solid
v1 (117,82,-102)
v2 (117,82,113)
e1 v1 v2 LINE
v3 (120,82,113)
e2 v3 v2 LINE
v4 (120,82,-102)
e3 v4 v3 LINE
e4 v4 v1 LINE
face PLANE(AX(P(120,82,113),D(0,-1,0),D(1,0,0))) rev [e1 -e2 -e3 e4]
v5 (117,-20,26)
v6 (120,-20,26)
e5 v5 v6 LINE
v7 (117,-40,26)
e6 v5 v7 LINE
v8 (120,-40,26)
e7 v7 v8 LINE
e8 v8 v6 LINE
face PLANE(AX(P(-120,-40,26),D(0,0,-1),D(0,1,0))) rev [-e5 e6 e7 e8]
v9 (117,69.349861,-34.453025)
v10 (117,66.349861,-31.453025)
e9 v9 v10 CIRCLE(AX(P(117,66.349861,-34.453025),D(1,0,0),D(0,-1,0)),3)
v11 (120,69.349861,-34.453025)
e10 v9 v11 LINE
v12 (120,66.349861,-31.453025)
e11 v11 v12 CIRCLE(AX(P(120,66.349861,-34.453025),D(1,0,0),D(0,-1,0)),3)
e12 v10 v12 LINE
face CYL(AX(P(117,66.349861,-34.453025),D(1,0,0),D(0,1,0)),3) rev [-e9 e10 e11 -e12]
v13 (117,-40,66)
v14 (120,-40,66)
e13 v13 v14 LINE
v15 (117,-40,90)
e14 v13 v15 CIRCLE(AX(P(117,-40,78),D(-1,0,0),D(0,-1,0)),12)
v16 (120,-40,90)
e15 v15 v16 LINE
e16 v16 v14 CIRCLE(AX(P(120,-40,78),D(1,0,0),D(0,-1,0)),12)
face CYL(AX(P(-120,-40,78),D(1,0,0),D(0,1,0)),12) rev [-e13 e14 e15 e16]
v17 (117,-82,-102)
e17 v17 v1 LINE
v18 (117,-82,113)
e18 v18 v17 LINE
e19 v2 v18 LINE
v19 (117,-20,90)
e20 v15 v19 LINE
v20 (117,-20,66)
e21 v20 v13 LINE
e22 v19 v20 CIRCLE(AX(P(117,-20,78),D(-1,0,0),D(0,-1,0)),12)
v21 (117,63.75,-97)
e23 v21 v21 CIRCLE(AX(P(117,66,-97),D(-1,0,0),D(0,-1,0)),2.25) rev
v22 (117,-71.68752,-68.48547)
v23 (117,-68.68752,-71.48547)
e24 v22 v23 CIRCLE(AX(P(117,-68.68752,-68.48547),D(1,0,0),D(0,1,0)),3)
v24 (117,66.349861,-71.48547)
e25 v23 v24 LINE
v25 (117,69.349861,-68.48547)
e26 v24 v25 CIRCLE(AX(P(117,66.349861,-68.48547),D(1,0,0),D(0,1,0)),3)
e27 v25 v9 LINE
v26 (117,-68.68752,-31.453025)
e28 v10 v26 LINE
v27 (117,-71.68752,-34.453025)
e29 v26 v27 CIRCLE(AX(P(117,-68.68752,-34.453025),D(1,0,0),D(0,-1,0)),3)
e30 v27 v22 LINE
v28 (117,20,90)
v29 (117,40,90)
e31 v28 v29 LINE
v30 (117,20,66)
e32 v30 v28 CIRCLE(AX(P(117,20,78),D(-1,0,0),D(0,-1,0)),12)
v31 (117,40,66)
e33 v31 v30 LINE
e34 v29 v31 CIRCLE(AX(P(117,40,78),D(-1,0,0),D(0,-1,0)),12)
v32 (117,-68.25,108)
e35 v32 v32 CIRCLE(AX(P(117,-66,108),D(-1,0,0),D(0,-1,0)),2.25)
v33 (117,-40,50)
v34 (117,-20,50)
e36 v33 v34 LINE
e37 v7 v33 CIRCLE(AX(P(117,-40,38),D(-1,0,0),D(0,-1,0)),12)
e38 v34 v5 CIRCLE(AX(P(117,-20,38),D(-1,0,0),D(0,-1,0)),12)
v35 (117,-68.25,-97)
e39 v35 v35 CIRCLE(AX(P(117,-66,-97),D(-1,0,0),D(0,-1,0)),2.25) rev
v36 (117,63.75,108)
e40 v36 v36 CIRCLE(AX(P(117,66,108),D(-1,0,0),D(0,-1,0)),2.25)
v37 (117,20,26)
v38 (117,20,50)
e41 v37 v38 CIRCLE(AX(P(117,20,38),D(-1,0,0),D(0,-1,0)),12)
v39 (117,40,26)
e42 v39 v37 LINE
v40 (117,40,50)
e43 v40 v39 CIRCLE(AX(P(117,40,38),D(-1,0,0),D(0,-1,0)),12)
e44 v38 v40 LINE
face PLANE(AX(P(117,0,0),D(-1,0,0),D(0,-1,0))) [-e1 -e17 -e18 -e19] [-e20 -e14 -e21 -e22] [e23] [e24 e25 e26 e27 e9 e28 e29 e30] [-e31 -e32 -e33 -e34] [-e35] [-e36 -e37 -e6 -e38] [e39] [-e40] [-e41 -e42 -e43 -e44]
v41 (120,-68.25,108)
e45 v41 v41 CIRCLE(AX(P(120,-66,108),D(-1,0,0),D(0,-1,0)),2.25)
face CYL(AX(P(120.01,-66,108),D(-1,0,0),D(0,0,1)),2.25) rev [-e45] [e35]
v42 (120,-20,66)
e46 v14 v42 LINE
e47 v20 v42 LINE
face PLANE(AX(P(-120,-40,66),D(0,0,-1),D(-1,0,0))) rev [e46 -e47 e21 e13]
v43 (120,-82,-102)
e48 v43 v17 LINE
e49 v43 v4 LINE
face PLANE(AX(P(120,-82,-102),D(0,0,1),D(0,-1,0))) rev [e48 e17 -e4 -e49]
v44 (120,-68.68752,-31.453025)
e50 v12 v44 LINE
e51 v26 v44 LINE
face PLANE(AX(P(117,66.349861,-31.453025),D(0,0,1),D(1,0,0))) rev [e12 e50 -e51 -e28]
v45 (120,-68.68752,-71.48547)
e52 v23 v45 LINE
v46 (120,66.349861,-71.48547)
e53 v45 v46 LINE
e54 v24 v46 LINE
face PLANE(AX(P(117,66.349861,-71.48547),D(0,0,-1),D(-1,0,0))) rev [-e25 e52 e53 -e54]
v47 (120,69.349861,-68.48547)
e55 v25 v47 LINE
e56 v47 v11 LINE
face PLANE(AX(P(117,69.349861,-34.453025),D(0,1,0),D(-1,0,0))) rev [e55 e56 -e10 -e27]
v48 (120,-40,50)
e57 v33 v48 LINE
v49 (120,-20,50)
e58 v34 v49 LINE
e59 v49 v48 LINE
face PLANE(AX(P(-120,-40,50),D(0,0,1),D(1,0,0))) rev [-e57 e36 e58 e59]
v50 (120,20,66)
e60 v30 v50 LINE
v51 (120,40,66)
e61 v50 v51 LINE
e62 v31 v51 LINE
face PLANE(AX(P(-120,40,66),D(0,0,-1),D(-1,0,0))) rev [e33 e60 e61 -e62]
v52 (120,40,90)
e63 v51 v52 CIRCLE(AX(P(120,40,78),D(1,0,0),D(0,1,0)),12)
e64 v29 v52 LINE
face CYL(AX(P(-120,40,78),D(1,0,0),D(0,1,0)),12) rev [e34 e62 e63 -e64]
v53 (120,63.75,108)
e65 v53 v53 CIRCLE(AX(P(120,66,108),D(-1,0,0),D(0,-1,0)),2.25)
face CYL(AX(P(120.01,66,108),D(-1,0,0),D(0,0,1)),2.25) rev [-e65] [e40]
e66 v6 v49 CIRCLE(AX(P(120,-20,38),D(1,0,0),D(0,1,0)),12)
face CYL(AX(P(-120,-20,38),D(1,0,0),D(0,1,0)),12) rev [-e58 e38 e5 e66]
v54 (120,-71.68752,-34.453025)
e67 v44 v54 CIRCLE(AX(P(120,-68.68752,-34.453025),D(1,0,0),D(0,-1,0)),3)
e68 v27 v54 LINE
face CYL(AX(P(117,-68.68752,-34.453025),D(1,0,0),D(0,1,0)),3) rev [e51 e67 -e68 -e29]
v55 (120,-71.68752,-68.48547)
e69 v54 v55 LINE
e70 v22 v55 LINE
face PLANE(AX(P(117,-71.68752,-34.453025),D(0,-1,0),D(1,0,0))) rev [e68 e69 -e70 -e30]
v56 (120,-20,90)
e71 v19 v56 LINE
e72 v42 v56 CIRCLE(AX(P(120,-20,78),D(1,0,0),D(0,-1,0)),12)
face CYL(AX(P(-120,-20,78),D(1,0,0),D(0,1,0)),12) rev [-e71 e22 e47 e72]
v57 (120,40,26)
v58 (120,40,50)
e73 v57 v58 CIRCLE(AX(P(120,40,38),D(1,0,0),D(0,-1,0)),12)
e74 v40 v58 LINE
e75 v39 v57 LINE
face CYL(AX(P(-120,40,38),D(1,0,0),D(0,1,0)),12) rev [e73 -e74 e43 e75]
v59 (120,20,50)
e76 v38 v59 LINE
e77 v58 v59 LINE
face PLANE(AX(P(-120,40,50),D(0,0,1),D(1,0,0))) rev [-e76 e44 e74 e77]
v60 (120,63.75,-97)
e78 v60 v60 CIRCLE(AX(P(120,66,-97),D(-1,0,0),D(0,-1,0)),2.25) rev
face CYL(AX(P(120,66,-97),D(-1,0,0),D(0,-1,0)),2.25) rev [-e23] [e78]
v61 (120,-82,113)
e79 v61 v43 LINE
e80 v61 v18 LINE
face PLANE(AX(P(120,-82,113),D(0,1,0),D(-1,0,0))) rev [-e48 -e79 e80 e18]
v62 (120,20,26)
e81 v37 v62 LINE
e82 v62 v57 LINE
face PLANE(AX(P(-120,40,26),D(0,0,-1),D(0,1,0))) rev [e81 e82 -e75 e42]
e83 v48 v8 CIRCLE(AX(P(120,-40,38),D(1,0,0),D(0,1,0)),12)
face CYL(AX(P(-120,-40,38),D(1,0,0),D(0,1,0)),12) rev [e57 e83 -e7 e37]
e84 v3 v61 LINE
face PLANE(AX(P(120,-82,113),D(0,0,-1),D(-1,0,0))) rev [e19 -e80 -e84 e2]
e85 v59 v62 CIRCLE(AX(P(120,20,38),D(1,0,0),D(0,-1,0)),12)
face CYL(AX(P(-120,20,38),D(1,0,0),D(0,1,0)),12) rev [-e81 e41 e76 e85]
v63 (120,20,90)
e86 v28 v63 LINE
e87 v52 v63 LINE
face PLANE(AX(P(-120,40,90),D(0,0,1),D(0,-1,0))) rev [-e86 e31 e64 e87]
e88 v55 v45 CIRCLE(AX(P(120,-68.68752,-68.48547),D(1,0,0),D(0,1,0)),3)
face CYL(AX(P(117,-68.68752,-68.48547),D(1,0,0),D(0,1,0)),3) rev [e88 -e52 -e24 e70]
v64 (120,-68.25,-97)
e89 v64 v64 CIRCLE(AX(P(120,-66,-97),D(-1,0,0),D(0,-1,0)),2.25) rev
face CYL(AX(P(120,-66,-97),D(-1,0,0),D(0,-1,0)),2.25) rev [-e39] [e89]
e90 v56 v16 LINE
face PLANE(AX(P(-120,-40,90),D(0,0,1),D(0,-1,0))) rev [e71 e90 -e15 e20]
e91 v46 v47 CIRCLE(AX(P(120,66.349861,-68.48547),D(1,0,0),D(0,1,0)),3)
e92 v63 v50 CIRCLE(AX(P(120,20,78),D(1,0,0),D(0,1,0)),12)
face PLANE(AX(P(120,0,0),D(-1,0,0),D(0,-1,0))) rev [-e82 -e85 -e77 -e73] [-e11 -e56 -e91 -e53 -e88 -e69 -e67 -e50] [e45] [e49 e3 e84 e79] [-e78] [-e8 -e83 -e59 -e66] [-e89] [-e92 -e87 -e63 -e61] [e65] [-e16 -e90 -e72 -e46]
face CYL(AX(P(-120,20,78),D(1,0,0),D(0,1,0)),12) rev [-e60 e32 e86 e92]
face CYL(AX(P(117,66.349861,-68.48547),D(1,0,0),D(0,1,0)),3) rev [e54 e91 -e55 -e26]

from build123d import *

# Parameters (mm, degrees)
SKETCH_1_W                         = 240
SKETCH_1_H                         = 170
EXTRUDE_1_DEPTH                    = 3
EXTRUDE_2_DEPTH                    = 10
EXTRUDE_3_DEPTH                    = 10
SKETCH_4_R                         = 3
CUT_EXTRUDE_1_DEPTH                = 6
SKETCH_5_R                         = 2.1
CUT_EXTRUDE_2_DEPTH                = 253.117036314
SKETCH_7_R                         = 1.6
SKETCH_7_W                         = 103
SKETCH_7_H                         = 20
EXTRUDE_4_DEPTH                    = 3
SKETCH_8_W                         = 110
SKETCH_8_H                         = 164
SKETCH_8_R                         = 2.1
EXTRUDE_5_DEPTH                    = 3
SKETCH_9_W                         = 240
SKETCH_9_H                         = 110
EXTRUDE_6_DEPTH                    = 3
SKETCH_10_R                        = 1.6
EXTRUDE_7_DEPTH                    = 2
SKETCH_11_W                        = 10
SKETCH_11_H                        = 20.7
SKETCH_11_R                        = 3
EXTRUDE_8_DEPTH                    = 6
CUT_EXTRUDE_3_DEPTH                = 237.788935552
SKETCH_14_R                        = 5
SKETCH_14_R_2                      = 2.25
EXTRUDE_9_DEPTH                    = 5
SKETCH_16_W                        = 20
SKETCH_16_H                        = 150
EXTRUDE_13_DEPTH                   = 3
CUT_EXTRUDE_5_DEPTH                = 282.346761133
EXTRUDE_START                      = 100
EXTRUDE_14_DEPTH                   = 10
SKETCH_21_R                        = 1.65
CUT_EXTRUDE_6_DEPTH                = 242.828451593
SKETCH_22_R                        = 3
CUT_EXTRUDE_7_DEPTH                = 240.666434863
FILLET_1_R                         = 3
FILLET_2_R                         = 3
SKETCH_4_5_R                       = 2.25
F_4_5_3MM_DEPTH                    = 3.01
SKETCH_Y_6_R                       = 3
CUT_EXTRUDE_Y_6_DEPTH              = 6.01
SKETCH_Y_3_2_R                     = 1.6
CUT_EXTRUDE_Y_3_2_DEPTH            = 3.01
A_M4_2_R                           = 2.25
A_M4_DEPTH                         = 9.01
B_M4_2_R                           = 2.25
B_M4_DEPTH                         = 9.01
MOVE_FACE_M4_4_2_4_5_BY            = 0.15
MOVE_FACE_M4_4_2_4_5_2_BY          = 0.15
MOVE_FACE_M4_4_2_4_5_3_BY          = 0.15
MOVE_FACE_M4_4_2_4_5_4_BY          = 0.15
MOVE_FACE_M4_4_2_4_5_5_BY          = 0.15
MOVE_FACE_M4_4_2_4_5_6_BY          = 0.15
MOVE_FACE_M4_4_2_4_5_7_BY          = 0.15
MOVE_FACE_M4_4_2_4_5_8_BY          = 0.15
MOVE_FACE_M4_6_4_5_BY              = 0.75
MOVE_FACE_M4_6_4_5_2_BY            = 0.75
MOVE_FACE_M4_6_4_5_3_BY            = 0.75
MOVE_FACE_M4_6_4_5_4_BY            = 0.75
MOVE_START                         = -85
MOVE_FACE_M4_3_2_4_5_OUTLINE_R     = 2.25
MOVE_FACE_M4_3_2_4_5_OUTLINE_R_2   = 1.6
MOVE_FACE_M4_3_2_4_5_DEPTH         = 3
MOVE_START_2                       = 82
MOVE_FACE_M4_3_2_4_5_2_OUTLINE_R   = 2.25
MOVE_FACE_M4_3_2_4_5_2_OUTLINE_R_2 = 1.6
MOVE_FACE_M4_3_2_4_5_2_DEPTH       = 3
MOVE_START_3                       = 47
MOVE_FACE_6_M3_3_3_OUTLINE_R       = 3
MOVE_FACE_6_M3_3_3_OUTLINE_R_2     = 1.65
MOVE_FACE_6_M3_3_3_DEPTH           = 6
MOVE_FACE_6_M3_3_3_2_OUTLINE_R     = 3
MOVE_FACE_6_M3_3_3_2_OUTLINE_R_2   = 1.65
MOVE_FACE_6_M3_3_3_2_DEPTH         = 6
MOVE_START_4                       = -82
MOVE_FACE_6_M3_3_3_3_OUTLINE_R     = 3
MOVE_FACE_6_M3_3_3_3_OUTLINE_R_2   = 1.65
MOVE_FACE_6_M3_3_3_3_DEPTH         = 6
MOVE_START_5                       = 76
MOVE_FACE_6_M3_3_3_4_OUTLINE_R     = 3
MOVE_FACE_6_M3_3_3_4_OUTLINE_R_2   = 1.65
MOVE_FACE_6_M3_3_3_4_DEPTH         = 6
Y_M3_5_9_1_5_DEPTH                 = 1.5
Y_M3_5_9_1_5_3_DEPTH               = 1.5
V3_03_A_105_START                  = 117
V3_03_A_105_OUTLINE_W              = 164
V3_03_A_105_OUTLINE_H              = 105
V3_03_A_105_OUTLINE_R              = 2.25
V3_03_A_105_DEPTH                  = 3
V3_04_B_105_START                  = -120
V3_04_B_105_OUTLINE_W              = 164
V3_04_B_105_OUTLINE_H              = 105
V3_04_B_105_OUTLINE_R              = 2.25
V3_04_B_105_DEPTH                  = 3
V3_06_B_105_START                  = 82
V3_06_B_105_OUTLINE_W              = 240
V3_06_B_105_OUTLINE_H              = 105
V3_06_B_105_OUTLINE_R              = 2.25
V3_06_B_105_DEPTH                  = 3
V3_05_A_105_START                  = -85
V3_05_A_105_OUTLINE_R              = 2.25
V3_05_A_105_DEPTH                  = 3
V3_77X53_2_W                       = 77
V3_77X53_2_H                       = 53
V3_77X53_DEPTH                     = 3.01
CUT_EXTRUDE_8_DEPTH                = 140.649561403


# Read off the part's stored shape, not the designer's step: the move face step, the move face step, the move face step, the move face step, the move face step, the move face step
with BuildPart() as part:
    # Sketch 1 → Extrude 1 (new body)
    with BuildSketch(Plane.XY):
        Rectangle(SKETCH_1_W, SKETCH_1_H)
    extrude(amount=EXTRUDE_1_DEPTH)

    # Sketch 2 → Extrude 2 (add)
    with BuildSketch(Plane.XY.offset(3)):
        Polygon((117, -82), (117, -61), (111, -61), (111, -76), (96, -76), (96, -82), align=None)
        Polygon((96, 82), (117, 82), (117, 61), (111, 61), (111, 76), (96, 76), align=None)
        Polygon((-96, -82), (-117, -82), (-117, -61), (-111, -61), (-111, -76), (-96, -76), align=None)
        Polygon((-117, 82), (-117, 61), (-111, 61), (-111, 76), (-96, 76), (-96, 82), align=None)
    extrude(amount=EXTRUDE_2_DEPTH)

    # Sketch 3 → Extrude 3 (add)
    with BuildSketch(Plane.XY.offset(3)):
        Polygon((-22, 35), (-7, 35), (-7, 41), (-28, 41), (-43, 41), (-43, 35), (-28, 35), (-28, 20), (-22, 20), align=None)
        Polygon((117, 20), (111, 20), (111, 35), (96, 35), (96, 41), (117, 41), align=None)
        Polygon((-28, -35), (-28, -20), (-22, -20), (-22, -41), (-43, -41), (-43, -35), align=None)
        Polygon((-83, -41), (-83, -35), (-98, -35), (-98, -20), (-104, -20), (-104, -41), align=None)
        Polygon((-104, 20), (-104, 35), (-104, 41), (-98, 41), (-83, 41), (-83, 35), (-98, 35), (-98, 20), align=None)
    extrude(amount=EXTRUDE_3_DEPTH)

    # Sketch 4 → Cut-Extrude 1 (cut)
    with BuildSketch(Plane.XZ.offset(82)):
        with Locations((101, 8)):
            Circle(SKETCH_4_R)
        with Locations((-101, 8)):
            Circle(SKETCH_4_R)
    extrude(amount=-CUT_EXTRUDE_1_DEPTH, mode=Mode.SUBTRACT)

    # Sketch 5 → Cut-Extrude 2 (cut, through all)
    with BuildSketch(Plane.ZY.offset(117)):
        with Locations(Location((8, -66, 0), (0, 0, 270))):
            Circle(SKETCH_5_R)
        with Locations(Location((8, 66, 0), (0, 0, 270))):
            Circle(SKETCH_5_R)
    extrude(amount=-CUT_EXTRUDE_2_DEPTH, mode=Mode.SUBTRACT)

    # Sketch Y___6 → Cut-Extrude Y___6 (cut)
    with BuildSketch(Plane.XZ.offset(-76)):
        with Locations((-101, 8)):
            Circle(SKETCH_Y_6_R)
        with Locations((101, 8)):
            Circle(SKETCH_Y_6_R)
    extrude(amount=-CUT_EXTRUDE_Y_6_DEPTH, mode=Mode.SUBTRACT)

    # Move Face M4__4.2_4.5 3: a curved face moved inward by 0.15
    add(Solid.thicken(part.faces().sort_by_distance((-114, -63.9, 8))[0], -MOVE_FACE_M4_4_2_4_5_3_BY), mode=Mode.SUBTRACT)

    # Move Face M4__4.2_4.5 4: a curved face moved inward by 0.15
    add(Solid.thicken(part.faces().sort_by_distance((-114, 68.1, 8))[0], -MOVE_FACE_M4_4_2_4_5_4_BY), mode=Mode.SUBTRACT)

    # Move Face M4__4.2_4.5 5: a curved face moved inward by 0.15
    add(Solid.thicken(part.faces().sort_by_distance((114, 68.1, 8))[0], -MOVE_FACE_M4_4_2_4_5_5_BY), mode=Mode.SUBTRACT)

    # Move Face M4__4.2_4.5 6: a curved face moved inward by 0.15
    add(Solid.thicken(part.faces().sort_by_distance((114, -63.9, 8))[0], -MOVE_FACE_M4_4_2_4_5_6_BY), mode=Mode.SUBTRACT)

    # Move Face M4__6_4.5: a curved face moved outward by 0.75
    add(Solid.thicken(part.faces().sort_by_distance((-104, -79, 8))[0], MOVE_FACE_M4_6_4_5_BY))

    # Move Face M4__6_4.5 2: a curved face moved outward by 0.75
    add(Solid.thicken(part.faces().sort_by_distance((98, -79, 8))[0], MOVE_FACE_M4_6_4_5_2_BY))

    # Move Face M4__6_4.5 3: a curved face moved outward by 0.75
    add(Solid.thicken(part.faces().sort_by_distance((-104, 79, 8))[0], MOVE_FACE_M4_6_4_5_3_BY))

    # Move Face M4__6_4.5 4: a curved face moved outward by 0.75
    add(Solid.thicken(part.faces().sort_by_distance((98, 79, 8))[0], MOVE_FACE_M4_6_4_5_4_BY))


with BuildPart() as body_2:
    # Sketch 7 → Extrude 4 (new body)
    with BuildSketch(Plane.XZ.offset(85)):
        Polygon((-120, 3), (-83, 3), (-83, 13), (-43, 13), (-43, 3), (120, 3), (120, 113), (-120, 113), align=None)
        with Locations(Location((101, 8, 0), (0, 0, 270))):
            Circle(SKETCH_7_R, mode=Mode.SUBTRACT)
        with Locations(Location((-101, 8, 0), (0, 0, 270))):
            Circle(SKETCH_7_R, mode=Mode.SUBTRACT)
        with Locations((44.5, 23)):
            Rectangle(SKETCH_7_W, SKETCH_7_H, mode=Mode.SUBTRACT)
    extrude(amount=-EXTRUDE_4_DEPTH)


with BuildPart() as body_3:
    # Sketch 8 → Extrude 5 (new body)
    with BuildSketch(Plane(origin=(117, 0, 0), x_dir=(0, 0, -1), z_dir=(1, 0, 0))):
        with Locations((-58, 0)):
            Rectangle(SKETCH_8_W, SKETCH_8_H)
        with Locations(Location((-8, -66, 0), (0, 0, 90))):
            Circle(SKETCH_8_R, mode=Mode.SUBTRACT)
        with Locations(Location((-8, 66, 0), (0, 0, 90))):
            Circle(SKETCH_8_R, mode=Mode.SUBTRACT)
    extrude(amount=EXTRUDE_5_DEPTH)


with BuildPart() as body_4:
    # Mirror 1: mirrored copy
    add(body_3.part.mirror(Plane(origin=(0, 0, 0), x_dir=(0, 0, 1), z_dir=(1, 0, 0))))


with BuildPart() as body_5:
    # Sketch 9 → Extrude 6 (new body)
    with BuildSketch(Plane(origin=(0, 82, 0), x_dir=(1, 0, 0), z_dir=(0, 1, 0))):
        with Locations((0, -58)):
            Rectangle(SKETCH_9_W, SKETCH_9_H)
    extrude(amount=EXTRUDE_6_DEPTH)


    add(body_2.part)  # Extrude 8 merges body 2
    # Sketch 11 → Extrude 8 (add)
    # profile 1 of 4: a face of its own
    with BuildSketch(Plane(origin=(0, 0, 53), x_dir=(-1, 0, 0), z_dir=(0, 0, -1))):
        with Locations((-112, 71.65)):
            Rectangle(SKETCH_11_W, SKETCH_11_H)
        with Locations((-112, 66.3)):
            Circle(SKETCH_11_R, mode=Mode.SUBTRACT)
    # profile 2 of 4: a face of its own
    with BuildSketch(Plane(origin=(0, 0, 53), x_dir=(-1, 0, 0), z_dir=(0, 0, -1))):
        with Locations((-112, -71.65)):
            Rectangle(SKETCH_11_W, SKETCH_11_H)
        with Locations((-112, -66.3)):
            Circle(SKETCH_11_R, mode=Mode.SUBTRACT)
    # profile 3 of 4: a face of its own
    with BuildSketch(Plane(origin=(0, 0, 53), x_dir=(-1, 0, 0), z_dir=(0, 0, -1))):
        with Locations((-26, -71.65)):
            Rectangle(SKETCH_11_W, SKETCH_11_H)
        with Locations((-26, -66.3)):
            Circle(SKETCH_11_R, mode=Mode.SUBTRACT)
    # profile 4 of 4: a face of its own
    with BuildSketch(Plane(origin=(0, 0, 53), x_dir=(-1, 0, 0), z_dir=(0, 0, -1))):
        with Locations((-26, 71.65)):
            Rectangle(SKETCH_11_W, SKETCH_11_H)
        with Locations((-26, 66.3)):
            Circle(SKETCH_11_R, mode=Mode.SUBTRACT)
    extrude(amount=EXTRUDE_8_DEPTH)

    # Sketch 12 → Cut-Extrude 3 (cut, through all)
    with BuildSketch(Plane.XZ.offset(85)):
        with BuildLine():
            Line((109, 56), (5, 56))
            ThreePointArc((5, 56), (2.878679656, 56.878679656), (2, 59))
            Line((2, 59), (2, 73))
            ThreePointArc((2, 73), (2.878679656, 75.121320344), (5, 76))
            Line((5, 76), (109, 76))
            ThreePointArc((109, 76), (111.121320344, 75.121320344), (112, 73))
            Line((112, 73), (112, 59))
            ThreePointArc((112, 59), (111.121320344, 56.878679656), (109, 56))
        make_face()
    extrude(amount=-CUT_EXTRUDE_3_DEPTH, mode=Mode.SUBTRACT)

    # Sketch 14 → Extrude 9 (add)
    # profile 1 of 4: a face of its own
    with BuildSketch(Plane(origin=(0, 85, 0), x_dir=(1, 0, 0), z_dir=(0, 1, 0))):
        with Locations(Location((-109.209330844, -20.536345828, 0), (0, 0, 180))):
            Circle(SKETCH_14_R)
        with Locations(Location((-109.209330844, -20.536345828, 0), (0, 0, 180))):
            Circle(SKETCH_14_R_2, mode=Mode.SUBTRACT)
    # profile 2 of 4: a face of its own
    with BuildSketch(Plane(origin=(0, 85, 0), x_dir=(1, 0, 0), z_dir=(0, 1, 0))):
        with Locations(Location((-34.159330844, -20.536345828, 0), (0, 0, 180))):
            Circle(SKETCH_14_R)
        with Locations(Location((-34.159330844, -20.536345828, 0), (0, 0, 180))):
            Circle(SKETCH_14_R_2, mode=Mode.SUBTRACT)
    # profile 3 of 4: a face of its own
    with BuildSketch(Plane(origin=(0, 85, 0), x_dir=(1, 0, 0), z_dir=(0, 1, 0))):
        with Locations(Location((-34.159330844, -95.586345828, 0), (0, 0, 180))):
            Circle(SKETCH_14_R)
        with Locations(Location((-34.159330844, -95.586345828, 0), (0, 0, 180))):
            Circle(SKETCH_14_R_2, mode=Mode.SUBTRACT)
    # profile 4 of 4: a face of its own
    with BuildSketch(Plane(origin=(0, 85, 0), x_dir=(1, 0, 0), z_dir=(0, 1, 0))):
        with Locations(Location((-109.209330844, -95.586345828, 0), (0, 0, 180))):
            Circle(SKETCH_14_R)
        with Locations(Location((-109.209330844, -95.586345828, 0), (0, 0, 180))):
            Circle(SKETCH_14_R_2, mode=Mode.SUBTRACT)
    extrude(amount=EXTRUDE_9_DEPTH)


with BuildPart() as body_6:
    # Sketch 10 → Extrude 7 (new body)
    with BuildSketch(Plane.XY.offset(53)):
        Polygon((117, 82), (105.994732546, 82), (105.994732546, 66.3), (31.393483554, 66.3), (31.393483554, 82), (21, 82), (21, -82), (117, -82), align=None)
        with Locations((26, 66.3)):
            Circle(SKETCH_10_R, mode=Mode.SUBTRACT)
        with Locations((112, 66.3)):
            Circle(SKETCH_10_R, mode=Mode.SUBTRACT)
        with Locations((112, -66.3)):
            Circle(SKETCH_10_R, mode=Mode.SUBTRACT)
        with Locations((26, -66.3)):
            Circle(SKETCH_10_R, mode=Mode.SUBTRACT)
    extrude(amount=EXTRUDE_7_DEPTH)


with BuildPart() as body_6_2:
    # Sketch 16 → Extrude 13 (new body)
    with BuildSketch(Plane.XY.offset(113)):
        Polygon((-120, 85), (120, 85), (120, -85), (-120, -85), (-120, -15), (-112, -15), (-112, 15), (-120, 15), align=None)
        with Locations((21, 0)):
            Rectangle(SKETCH_16_W, SKETCH_16_H, mode=Mode.SUBTRACT)
    extrude(amount=EXTRUDE_13_DEPTH)

    # Sketch 20 → Extrude 14 (add)
    with BuildSketch(Plane.XY.offset(13).offset(EXTRUDE_START)):
        Polygon((111, 61), (111, 76), (96, 76), (96, 82), (117, 82), (117, 61), align=None)
        Polygon((-96, 82), (-117, 82), (-117, 61), (-111, 61), (-111, 76), (-96, 76), align=None)
        Polygon((-117, -61), (-117, -82), (-96, -82), (-96, -76), (-111, -76), (-111, -61), align=None)
        Polygon((111, -76), (96, -76), (96, -82), (117, -82), (117, -61), (111, -61), align=None)
    extrude(amount=-EXTRUDE_14_DEPTH)


with BuildPart() as cut_extrude_5_tool:
    # Sketch 18 → Cut-Extrude 5 (new, through all)
    with BuildSketch(Plane(origin=(120, 0, 0), x_dir=(0, 0, -1), z_dir=(1, 0, 0))):
        with BuildLine():
            Line((-66, 40), (-66, 20))
            ThreePointArc((-66, 20), (-78, 8), (-90, 20))
            Line((-90, 20), (-90, 40))
            ThreePointArc((-90, 40), (-78, 52), (-66, 40))
        make_face()
        with BuildLine():
            Line((-66, -40), (-66, -20))
            ThreePointArc((-66, -20), (-78, -8), (-90, -20))
            Line((-90, -20), (-90, -40))
            ThreePointArc((-90, -40), (-78, -52), (-66, -40))
        make_face()
        with BuildLine():
            Line((-50, -40), (-50, -20))
            ThreePointArc((-50, -20), (-38, -8), (-26, -20))
            Line((-26, -20), (-26, -40))
            ThreePointArc((-26, -40), (-38, -52), (-50, -40))
        make_face()
        with BuildLine():
            Line((-50, 40), (-50, 20))
            ThreePointArc((-50, 20), (-38, 8), (-26, 20))
            Line((-26, 20), (-26, 40))
            ThreePointArc((-26, 40), (-38, 52), (-50, 40))
        make_face()
    extrude(amount=-CUT_EXTRUDE_5_DEPTH)


with BuildPart() as body_3_1:
    add(body_3.part)

    # Cut-Extrude 5: cut by cut_extrude_5_tool
    add(cut_extrude_5_tool.part, mode=Mode.SUBTRACT)


with BuildPart() as body_4_1:
    add(body_4.part)

    # Cut-Extrude 5: cut by cut_extrude_5_tool
    add(cut_extrude_5_tool.part, mode=Mode.SUBTRACT)


with BuildPart() as cut_extrude_6_tool:
    # Sketch 21 → Cut-Extrude 6 (new, through all)
    with BuildSketch(Plane.XZ.offset(85)):
        with Locations(Location((101, 108, 0), (0, 0, 180))):
            Circle(SKETCH_21_R)
        with Locations(Location((-101, 108, 0), (0, 0, 180))):
            Circle(SKETCH_21_R)
    extrude(amount=-CUT_EXTRUDE_6_DEPTH)


with BuildPart() as body_5_1:
    add(body_5.part)

    # Cut-Extrude 6: cut by cut_extrude_6_tool
    add(cut_extrude_6_tool.part, mode=Mode.SUBTRACT)

    # Fillet 1
    fillet_1_edges = [body_5_1.edges().sort_by_distance(p)[0] for p in [
        (-43, -83.5, 13),
        (-83, -83.5, 13),
        (96, -83.5, 13),
        (-7, -83.5, 13),
        (-7, -83.5, 33),
        (96, -83.5, 33),
    ]]
    fillet(fillet_1_edges, radius=FILLET_1_R)

    # Sketch 4.5 → 4.5___3mm (cut)
    with BuildSketch(Plane.XZ.offset(-82)):
        with Locations((-109.209330844, 20.536345828)):
            Circle(SKETCH_4_5_R)
        with Locations((-34.159330844, 20.536345828)):
            Circle(SKETCH_4_5_R)
        with Locations((-34.159330844, 95.586345828)):
            Circle(SKETCH_4_5_R)
        with Locations((-109.209330844, 95.586345828)):
            Circle(SKETCH_4_5_R)
    extrude(amount=-F_4_5_3MM_DEPTH, mode=Mode.SUBTRACT)

    # Sketch Y___3.2 → Cut-Extrude Y___3.2 (cut)
    with BuildSketch(Plane.XZ.offset(-82)):
        with Locations((-101, 8)):
            Circle(SKETCH_Y_3_2_R)
        with Locations((101, 8)):
            Circle(SKETCH_Y_3_2_R)
    extrude(amount=-CUT_EXTRUDE_Y_3_2_DEPTH, mode=Mode.SUBTRACT)

    # Move Face M4__3.2_4.5 outline → Move Face M4__3.2_4.5 (cut)
    # profile 1 of 2: a face of its own
    with BuildSketch(Plane(origin=(0, 0, 0), x_dir=(1, 0, 0), z_dir=(0, 1, 0)).offset(MOVE_START)):
        with Locations((101, -8)):
            Circle(MOVE_FACE_M4_3_2_4_5_OUTLINE_R)
        with Locations((101, -8)):
            Circle(MOVE_FACE_M4_3_2_4_5_OUTLINE_R_2, mode=Mode.SUBTRACT)
    # profile 2 of 2: a face of its own
    with BuildSketch(Plane(origin=(0, 0, 0), x_dir=(1, 0, 0), z_dir=(0, 1, 0)).offset(MOVE_START)):
        with Locations((-101, -8)):
            Circle(MOVE_FACE_M4_3_2_4_5_OUTLINE_R)
        with Locations((-101, -8)):
            Circle(MOVE_FACE_M4_3_2_4_5_OUTLINE_R_2, mode=Mode.SUBTRACT)
    extrude(amount=MOVE_FACE_M4_3_2_4_5_DEPTH, mode=Mode.SUBTRACT)

    # Move Face M4__3.2_4.5 2 outline → Move Face M4__3.2_4.5 2 (cut)
    # profile 1 of 2: a face of its own
    with BuildSketch(Plane(origin=(0, 0, 0), x_dir=(1, 0, 0), z_dir=(0, 1, 0)).offset(MOVE_START_2)):
        with Locations((101, -8)):
            Circle(MOVE_FACE_M4_3_2_4_5_2_OUTLINE_R)
        with Locations((101, -8)):
            Circle(MOVE_FACE_M4_3_2_4_5_2_OUTLINE_R_2, mode=Mode.SUBTRACT)
    # profile 2 of 2: a face of its own
    with BuildSketch(Plane(origin=(0, 0, 0), x_dir=(1, 0, 0), z_dir=(0, 1, 0)).offset(MOVE_START_2)):
        with Locations((-101, -8)):
            Circle(MOVE_FACE_M4_3_2_4_5_2_OUTLINE_R)
        with Locations((-101, -8)):
            Circle(MOVE_FACE_M4_3_2_4_5_2_OUTLINE_R_2, mode=Mode.SUBTRACT)
    extrude(amount=MOVE_FACE_M4_3_2_4_5_2_DEPTH, mode=Mode.SUBTRACT)

    # Move Face 6_M3_3.3 outline → Move Face 6_M3_3.3 (add)
    # profile 1 of 2: a face of its own
    with BuildSketch(Plane.XY.offset(MOVE_START_3)):
        with Locations((112, 66.3)):
            Circle(MOVE_FACE_6_M3_3_3_OUTLINE_R)
        with Locations((112, 66.3)):
            Circle(MOVE_FACE_6_M3_3_3_OUTLINE_R_2, mode=Mode.SUBTRACT)
    # profile 2 of 2: a face of its own
    with BuildSketch(Plane.XY.offset(MOVE_START_3)):
        with Locations((26, 66.3)):
            Circle(MOVE_FACE_6_M3_3_3_OUTLINE_R)
        with Locations((26, 66.3)):
            Circle(MOVE_FACE_6_M3_3_3_OUTLINE_R_2, mode=Mode.SUBTRACT)
    extrude(amount=MOVE_FACE_6_M3_3_3_DEPTH)

    # Move Face 6_M3_3.3 2 outline → Move Face 6_M3_3.3 2 (add)
    # profile 1 of 2: a face of its own
    with BuildSketch(Plane.XY.offset(MOVE_START_3)):
        with Locations((112, -66.3)):
            Circle(MOVE_FACE_6_M3_3_3_2_OUTLINE_R)
        with Locations((112, -66.3)):
            Circle(MOVE_FACE_6_M3_3_3_2_OUTLINE_R_2, mode=Mode.SUBTRACT)
    # profile 2 of 2: a face of its own
    with BuildSketch(Plane.XY.offset(MOVE_START_3)):
        with Locations((26, -66.3)):
            Circle(MOVE_FACE_6_M3_3_3_2_OUTLINE_R)
        with Locations((26, -66.3)):
            Circle(MOVE_FACE_6_M3_3_3_2_OUTLINE_R_2, mode=Mode.SUBTRACT)
    extrude(amount=MOVE_FACE_6_M3_3_3_2_DEPTH)

    # v3_06__B__105 outline → v3_06__B__105 (add)
    # profile 1 of 3: a face of its own
    with BuildSketch(Plane(origin=(0, 0, 0), x_dir=(1, 0, 0), z_dir=(0, 1, 0)).offset(V3_06_B_105_START)):
        with Locations((0, 49.5)):
            Rectangle(V3_06_B_105_OUTLINE_W, V3_06_B_105_OUTLINE_H)
        with Locations((-101, 97)):
            Circle(V3_06_B_105_OUTLINE_R, mode=Mode.SUBTRACT)
        with Locations((101, 97)):
            Circle(V3_06_B_105_OUTLINE_R, mode=Mode.SUBTRACT)
    # profile 2 of 3: a face of its own
    with BuildSketch(Plane(origin=(0, 0, 0), x_dir=(1, 0, 0), z_dir=(0, 1, 0)).offset(V3_06_B_105_START)):
        with Locations((101, -8)):
            Circle(V3_06_B_105_OUTLINE_R)
    # profile 3 of 3: a face of its own
    with BuildSketch(Plane(origin=(0, 0, 0), x_dir=(1, 0, 0), z_dir=(0, 1, 0)).offset(V3_06_B_105_START)):
        with Locations((-101, -8)):
            Circle(V3_06_B_105_OUTLINE_R)
    extrude(amount=V3_06_B_105_DEPTH)

    # v3_05__A__105 outline → v3_05__A__105 (add)
    # profile 1 of 3: a face of its own
    with BuildSketch(Plane(origin=(0, 0, 0), x_dir=(1, 0, 0), z_dir=(0, 1, 0)).offset(V3_05_A_105_START)):
        with BuildLine():
            Line((-43, -3), (120, -3))
            Line((120, -3), (120, 102))
            Line((120, 102), (-43, 102))
            Line((-43, 102), (-43, 95))
            ThreePointArc((-43, 95), (-43.878679656, 92.878679656), (-46, 92))
            Line((-46, 92), (-80, 92))
            ThreePointArc((-80, 92), (-82.121320344, 92.878679656), (-83, 95))
            Line((-83, 95), (-83, 102))
            Line((-83, 102), (-120, 102))
            Line((-120, 102), (-120, -3))
            Line((-120, -3), (-83, -3))
            Line((-83, -3), (-83, -10))
            ThreePointArc((-83, -10), (-82.121320344, -12.121320344), (-80, -13))
            Line((-80, -13), (-46, -13))
            ThreePointArc((-46, -13), (-43.878679656, -12.121320344), (-43, -10))
            Line((-43, -10), (-43, -3))
        make_face()
        with Locations((-101, 97)):
            Circle(V3_05_A_105_OUTLINE_R, mode=Mode.SUBTRACT)
        with Locations((101, 97)):
            Circle(V3_05_A_105_OUTLINE_R, mode=Mode.SUBTRACT)
    # profile 2 of 3: a face of its own
    with BuildSketch(Plane(origin=(0, 0, 0), x_dir=(1, 0, 0), z_dir=(0, 1, 0)).offset(V3_05_A_105_START)):
        with Locations((101, -8)):
            Circle(V3_05_A_105_OUTLINE_R)
    # profile 3 of 3: a face of its own
    with BuildSketch(Plane(origin=(0, 0, 0), x_dir=(1, 0, 0), z_dir=(0, 1, 0)).offset(V3_05_A_105_START)):
        with Locations((-101, -8)):
            Circle(V3_05_A_105_OUTLINE_R)
    extrude(amount=V3_05_A_105_DEPTH)

    # v3__77x53 2 → v3__77x53 (cut)
    with BuildSketch(Plane(origin=(0, 85, 0), x_dir=(1, 0, 0), z_dir=(0, 1, 0))):
        with Locations((69, 58.5)):
            Rectangle(V3_77X53_2_W, V3_77X53_2_H)
    extrude(amount=-V3_77X53_DEPTH, mode=Mode.SUBTRACT)


with BuildPart() as body_6_2_1:
    add(body_6_2.part)

    # Cut-Extrude 6: cut by cut_extrude_6_tool
    add(cut_extrude_6_tool.part, mode=Mode.SUBTRACT)

    # Sketch 22 → Cut-Extrude 7 (cut, through all)
    with BuildSketch(Plane.XZ.offset(82)):
        with Locations((-101, 108)):
            Circle(SKETCH_22_R)
        with Locations(Location((101, 108, 0), (0, 0, 270))):
            Circle(SKETCH_22_R)
    extrude(amount=-CUT_EXTRUDE_7_DEPTH, mode=Mode.SUBTRACT)

    # Fillet 2
    fillet_2_edges = [body_6_2_1.edges().sort_by_distance(p)[0] for p in [
        (-112, -15, 114.5),
        (-112, 15, 114.5),
        (31, -75, 114.5),
        (31, 75, 114.5),
        (11, 75, 114.5),
        (11, -75, 114.5),
    ]]
    fillet(fillet_2_edges, radius=FILLET_2_R)


with BuildPart() as a_m4_tool:
    # A___M4 2 → A___M4 (new body)
    with BuildSketch(Plane.ZY.offset(-111)):
        with Locations(Location((108, -66, 0), (0, 0, 270))):
            Circle(A_M4_2_R)
        with Locations(Location((108, 66, 0), (0, 0, 270))):
            Circle(A_M4_2_R)
    extrude(amount=-A_M4_DEPTH)


with BuildPart() as body_3_2:
    add(body_3_1.part)

    # A___M4: cut by a_m4_tool
    add(a_m4_tool.part, mode=Mode.SUBTRACT)

    # Move Face M4__4.2_4.5: a curved face moved inward by 0.15
    add(Solid.thicken(body_3_2.faces().sort_by_distance((118.5, -68.1, 8))[0], -MOVE_FACE_M4_4_2_4_5_BY), mode=Mode.SUBTRACT)

    # Move Face M4__4.2_4.5 2: a curved face moved inward by 0.15
    add(Solid.thicken(body_3_2.faces().sort_by_distance((118.5, 63.9, 8))[0], -MOVE_FACE_M4_4_2_4_5_2_BY), mode=Mode.SUBTRACT)

    # v3_03__A__105 outline → v3_03__A__105 (add)
    # profile 1 of 3: a face of its own
    with BuildSketch(Plane.YZ.offset(V3_03_A_105_START)):
        with Locations((0, -49.5)):
            Rectangle(V3_03_A_105_OUTLINE_W, V3_03_A_105_OUTLINE_H)
        with Locations((-66, -97)):
            Circle(V3_03_A_105_OUTLINE_R, mode=Mode.SUBTRACT)
        with Locations((66, -97)):
            Circle(V3_03_A_105_OUTLINE_R, mode=Mode.SUBTRACT)
    # profile 2 of 3: a face of its own
    with BuildSketch(Plane.YZ.offset(V3_03_A_105_START)):
        with Locations((-66, 8)):
            Circle(V3_03_A_105_OUTLINE_R)
    # profile 3 of 3: a face of its own
    with BuildSketch(Plane.YZ.offset(V3_03_A_105_START)):
        with Locations((66, 8)):
            Circle(V3_03_A_105_OUTLINE_R)
    extrude(amount=V3_03_A_105_DEPTH)

    # Sketch 26 → Cut-Extrude 8 (cut, through all)
    with BuildSketch(Plane(origin=(120, 0, 0), x_dir=(0, 0, -1), z_dir=(1, 0, 0))):
        with BuildLine():
            Line((34.453025431, 69.349860583), (68.485469648, 69.349860583))
            ThreePointArc((68.485469648, 69.349860583), (70.606789992, 68.471180927), (71.485469648, 66.349860583))
            Line((71.485469648, 66.349860583), (71.485469648, -68.687519812))
            ThreePointArc((71.485469648, -68.687519812), (70.606789992, -70.808840156), (68.485469648, -71.687519812))
            Line((68.485469648, -71.687519812), (34.453025431, -71.687519812))
            ThreePointArc((34.453025431, -71.687519812), (32.331705088, -70.808840156), (31.453025431, -68.687519812))
            Line((31.453025431, -68.687519812), (31.453025431, 66.349860583))
            ThreePointArc((31.453025431, 66.349860583), (32.331705088, 68.471180927), (34.453025431, 69.349860583))
        make_face()
    extrude(amount=-CUT_EXTRUDE_8_DEPTH, mode=Mode.SUBTRACT)


with BuildPart() as body_6_2_2:
    add(body_6_2_1.part)

    # A___M4: cut by a_m4_tool
    add(a_m4_tool.part, mode=Mode.SUBTRACT)


with BuildPart() as b_m4_tool:
    # B___M4 2 → B___M4 (new body)
    with BuildSketch(Plane(origin=(-111, 0, 0), x_dir=(0, 0, -1), z_dir=(1, 0, 0))):
        with Locations(Location((-108, -66, 0), (0, 0, 270))):
            Circle(B_M4_2_R)
        with Locations(Location((-108, 66, 0), (0, 0, 270))):
            Circle(B_M4_2_R)
    extrude(amount=-B_M4_DEPTH)


with BuildPart() as body_4_2:
    add(body_4_1.part)

    # B___M4: cut by b_m4_tool
    add(b_m4_tool.part, mode=Mode.SUBTRACT)

    # Move Face M4__4.2_4.5 7: a curved face moved inward by 0.15
    add(Solid.thicken(body_4_2.faces().sort_by_distance((-118.5, -68.1, 8))[0], -MOVE_FACE_M4_4_2_4_5_7_BY), mode=Mode.SUBTRACT)

    # Move Face M4__4.2_4.5 8: a curved face moved inward by 0.15
    add(Solid.thicken(body_4_2.faces().sort_by_distance((-118.5, 63.9, 8))[0], -MOVE_FACE_M4_4_2_4_5_8_BY), mode=Mode.SUBTRACT)

    # v3_04__B__105 outline → v3_04__B__105 (add)
    # profile 1 of 3: a face of its own
    with BuildSketch(Plane.YZ.offset(V3_04_B_105_START)):
        with Locations((0, -49.5)):
            Rectangle(V3_04_B_105_OUTLINE_W, V3_04_B_105_OUTLINE_H)
        with Locations((-66, -97)):
            Circle(V3_04_B_105_OUTLINE_R, mode=Mode.SUBTRACT)
        with Locations((66, -97)):
            Circle(V3_04_B_105_OUTLINE_R, mode=Mode.SUBTRACT)
    # profile 2 of 3: a face of its own
    with BuildSketch(Plane.YZ.offset(V3_04_B_105_START)):
        with Locations((-66, 8)):
            Circle(V3_04_B_105_OUTLINE_R)
    # profile 3 of 3: a face of its own
    with BuildSketch(Plane.YZ.offset(V3_04_B_105_START)):
        with Locations((66, 8)):
            Circle(V3_04_B_105_OUTLINE_R)
    extrude(amount=V3_04_B_105_DEPTH)


with BuildPart() as body_6_2_3:
    add(body_6_2_2.part)

    # B___M4: cut by b_m4_tool
    add(b_m4_tool.part, mode=Mode.SUBTRACT)

    # Move Face 6_M3_3.3 3 outline → Move Face 6_M3_3.3 3 (add)
    # profile 1 of 2: a face of its own
    with BuildSketch(Plane(origin=(0, 0, 0), x_dir=(1, 0, 0), z_dir=(0, 1, 0)).offset(MOVE_START_4)):
        with Locations((101, -108)):
            Circle(MOVE_FACE_6_M3_3_3_3_OUTLINE_R)
        with Locations((101, -108)):
            Circle(MOVE_FACE_6_M3_3_3_3_OUTLINE_R_2, mode=Mode.SUBTRACT)
    # profile 2 of 2: a face of its own
    with BuildSketch(Plane(origin=(0, 0, 0), x_dir=(1, 0, 0), z_dir=(0, 1, 0)).offset(MOVE_START_4)):
        with Locations((-101, -108)):
            Circle(MOVE_FACE_6_M3_3_3_3_OUTLINE_R)
        with Locations((-101, -108)):
            Circle(MOVE_FACE_6_M3_3_3_3_OUTLINE_R_2, mode=Mode.SUBTRACT)
    extrude(amount=MOVE_FACE_6_M3_3_3_3_DEPTH)

    # Move Face 6_M3_3.3 4 outline → Move Face 6_M3_3.3 4 (add)
    # profile 1 of 2: a face of its own
    with BuildSketch(Plane(origin=(0, 0, 0), x_dir=(1, 0, 0), z_dir=(0, 1, 0)).offset(MOVE_START_5)):
        with Locations((101, -108)):
            Circle(MOVE_FACE_6_M3_3_3_4_OUTLINE_R)
        with Locations((101, -108)):
            Circle(MOVE_FACE_6_M3_3_3_4_OUTLINE_R_2, mode=Mode.SUBTRACT)
    # profile 2 of 2: a face of its own
    with BuildSketch(Plane(origin=(0, 0, 0), x_dir=(1, 0, 0), z_dir=(0, 1, 0)).offset(MOVE_START_5)):
        with Locations((-101, -108)):
            Circle(MOVE_FACE_6_M3_3_3_4_OUTLINE_R)
        with Locations((-101, -108)):
            Circle(MOVE_FACE_6_M3_3_3_4_OUTLINE_R_2, mode=Mode.SUBTRACT)
    extrude(amount=MOVE_FACE_6_M3_3_3_4_DEPTH)

    # Y__M3___5.9_1.5 2 → Y__M3___5.9_1.5 (cut)
    with BuildSketch(Plane.XZ.offset(-76)):
        Polygon((-97.593633412, 108), (-99.296816706, 110.95), (-102.703183294, 110.95), (-104.406366588, 108), (-102.703183294, 105.05), (-99.296816706, 105.05), align=None)
        Polygon((104.406366588, 108), (102.703183294, 110.95), (99.296816706, 110.95), (97.593633412, 108), (99.296816706, 105.05), (102.703183294, 105.05), align=None)
    extrude(amount=-Y_M3_5_9_1_5_DEPTH, mode=Mode.SUBTRACT)

    # Y__M3___5.9_1.5 4 → Y__M3___5.9_1.5 3 (cut)
    with BuildSketch(Plane(origin=(0, -76, 0), x_dir=(1, 0, 0), z_dir=(0, 1, 0))):
        Polygon((-97.593633412, -108), (-99.296816706, -110.95), (-102.703183294, -110.95), (-104.406366588, -108), (-102.703183294, -105.05), (-99.296816706, -105.05), align=None)
        Polygon((104.406366588, -108), (102.703183294, -110.95), (99.296816706, -110.95), (97.593633412, -108), (99.296816706, -105.05), (102.703183294, -105.05), align=None)
    extrude(amount=-Y_M3_5_9_1_5_3_DEPTH, mode=Mode.SUBTRACT)


with BuildPart() as part_1:
    # Move Body v3__105: moved
    add(part.part.moved(Location((0, 0, -105))))


solid = body_3_2.part
